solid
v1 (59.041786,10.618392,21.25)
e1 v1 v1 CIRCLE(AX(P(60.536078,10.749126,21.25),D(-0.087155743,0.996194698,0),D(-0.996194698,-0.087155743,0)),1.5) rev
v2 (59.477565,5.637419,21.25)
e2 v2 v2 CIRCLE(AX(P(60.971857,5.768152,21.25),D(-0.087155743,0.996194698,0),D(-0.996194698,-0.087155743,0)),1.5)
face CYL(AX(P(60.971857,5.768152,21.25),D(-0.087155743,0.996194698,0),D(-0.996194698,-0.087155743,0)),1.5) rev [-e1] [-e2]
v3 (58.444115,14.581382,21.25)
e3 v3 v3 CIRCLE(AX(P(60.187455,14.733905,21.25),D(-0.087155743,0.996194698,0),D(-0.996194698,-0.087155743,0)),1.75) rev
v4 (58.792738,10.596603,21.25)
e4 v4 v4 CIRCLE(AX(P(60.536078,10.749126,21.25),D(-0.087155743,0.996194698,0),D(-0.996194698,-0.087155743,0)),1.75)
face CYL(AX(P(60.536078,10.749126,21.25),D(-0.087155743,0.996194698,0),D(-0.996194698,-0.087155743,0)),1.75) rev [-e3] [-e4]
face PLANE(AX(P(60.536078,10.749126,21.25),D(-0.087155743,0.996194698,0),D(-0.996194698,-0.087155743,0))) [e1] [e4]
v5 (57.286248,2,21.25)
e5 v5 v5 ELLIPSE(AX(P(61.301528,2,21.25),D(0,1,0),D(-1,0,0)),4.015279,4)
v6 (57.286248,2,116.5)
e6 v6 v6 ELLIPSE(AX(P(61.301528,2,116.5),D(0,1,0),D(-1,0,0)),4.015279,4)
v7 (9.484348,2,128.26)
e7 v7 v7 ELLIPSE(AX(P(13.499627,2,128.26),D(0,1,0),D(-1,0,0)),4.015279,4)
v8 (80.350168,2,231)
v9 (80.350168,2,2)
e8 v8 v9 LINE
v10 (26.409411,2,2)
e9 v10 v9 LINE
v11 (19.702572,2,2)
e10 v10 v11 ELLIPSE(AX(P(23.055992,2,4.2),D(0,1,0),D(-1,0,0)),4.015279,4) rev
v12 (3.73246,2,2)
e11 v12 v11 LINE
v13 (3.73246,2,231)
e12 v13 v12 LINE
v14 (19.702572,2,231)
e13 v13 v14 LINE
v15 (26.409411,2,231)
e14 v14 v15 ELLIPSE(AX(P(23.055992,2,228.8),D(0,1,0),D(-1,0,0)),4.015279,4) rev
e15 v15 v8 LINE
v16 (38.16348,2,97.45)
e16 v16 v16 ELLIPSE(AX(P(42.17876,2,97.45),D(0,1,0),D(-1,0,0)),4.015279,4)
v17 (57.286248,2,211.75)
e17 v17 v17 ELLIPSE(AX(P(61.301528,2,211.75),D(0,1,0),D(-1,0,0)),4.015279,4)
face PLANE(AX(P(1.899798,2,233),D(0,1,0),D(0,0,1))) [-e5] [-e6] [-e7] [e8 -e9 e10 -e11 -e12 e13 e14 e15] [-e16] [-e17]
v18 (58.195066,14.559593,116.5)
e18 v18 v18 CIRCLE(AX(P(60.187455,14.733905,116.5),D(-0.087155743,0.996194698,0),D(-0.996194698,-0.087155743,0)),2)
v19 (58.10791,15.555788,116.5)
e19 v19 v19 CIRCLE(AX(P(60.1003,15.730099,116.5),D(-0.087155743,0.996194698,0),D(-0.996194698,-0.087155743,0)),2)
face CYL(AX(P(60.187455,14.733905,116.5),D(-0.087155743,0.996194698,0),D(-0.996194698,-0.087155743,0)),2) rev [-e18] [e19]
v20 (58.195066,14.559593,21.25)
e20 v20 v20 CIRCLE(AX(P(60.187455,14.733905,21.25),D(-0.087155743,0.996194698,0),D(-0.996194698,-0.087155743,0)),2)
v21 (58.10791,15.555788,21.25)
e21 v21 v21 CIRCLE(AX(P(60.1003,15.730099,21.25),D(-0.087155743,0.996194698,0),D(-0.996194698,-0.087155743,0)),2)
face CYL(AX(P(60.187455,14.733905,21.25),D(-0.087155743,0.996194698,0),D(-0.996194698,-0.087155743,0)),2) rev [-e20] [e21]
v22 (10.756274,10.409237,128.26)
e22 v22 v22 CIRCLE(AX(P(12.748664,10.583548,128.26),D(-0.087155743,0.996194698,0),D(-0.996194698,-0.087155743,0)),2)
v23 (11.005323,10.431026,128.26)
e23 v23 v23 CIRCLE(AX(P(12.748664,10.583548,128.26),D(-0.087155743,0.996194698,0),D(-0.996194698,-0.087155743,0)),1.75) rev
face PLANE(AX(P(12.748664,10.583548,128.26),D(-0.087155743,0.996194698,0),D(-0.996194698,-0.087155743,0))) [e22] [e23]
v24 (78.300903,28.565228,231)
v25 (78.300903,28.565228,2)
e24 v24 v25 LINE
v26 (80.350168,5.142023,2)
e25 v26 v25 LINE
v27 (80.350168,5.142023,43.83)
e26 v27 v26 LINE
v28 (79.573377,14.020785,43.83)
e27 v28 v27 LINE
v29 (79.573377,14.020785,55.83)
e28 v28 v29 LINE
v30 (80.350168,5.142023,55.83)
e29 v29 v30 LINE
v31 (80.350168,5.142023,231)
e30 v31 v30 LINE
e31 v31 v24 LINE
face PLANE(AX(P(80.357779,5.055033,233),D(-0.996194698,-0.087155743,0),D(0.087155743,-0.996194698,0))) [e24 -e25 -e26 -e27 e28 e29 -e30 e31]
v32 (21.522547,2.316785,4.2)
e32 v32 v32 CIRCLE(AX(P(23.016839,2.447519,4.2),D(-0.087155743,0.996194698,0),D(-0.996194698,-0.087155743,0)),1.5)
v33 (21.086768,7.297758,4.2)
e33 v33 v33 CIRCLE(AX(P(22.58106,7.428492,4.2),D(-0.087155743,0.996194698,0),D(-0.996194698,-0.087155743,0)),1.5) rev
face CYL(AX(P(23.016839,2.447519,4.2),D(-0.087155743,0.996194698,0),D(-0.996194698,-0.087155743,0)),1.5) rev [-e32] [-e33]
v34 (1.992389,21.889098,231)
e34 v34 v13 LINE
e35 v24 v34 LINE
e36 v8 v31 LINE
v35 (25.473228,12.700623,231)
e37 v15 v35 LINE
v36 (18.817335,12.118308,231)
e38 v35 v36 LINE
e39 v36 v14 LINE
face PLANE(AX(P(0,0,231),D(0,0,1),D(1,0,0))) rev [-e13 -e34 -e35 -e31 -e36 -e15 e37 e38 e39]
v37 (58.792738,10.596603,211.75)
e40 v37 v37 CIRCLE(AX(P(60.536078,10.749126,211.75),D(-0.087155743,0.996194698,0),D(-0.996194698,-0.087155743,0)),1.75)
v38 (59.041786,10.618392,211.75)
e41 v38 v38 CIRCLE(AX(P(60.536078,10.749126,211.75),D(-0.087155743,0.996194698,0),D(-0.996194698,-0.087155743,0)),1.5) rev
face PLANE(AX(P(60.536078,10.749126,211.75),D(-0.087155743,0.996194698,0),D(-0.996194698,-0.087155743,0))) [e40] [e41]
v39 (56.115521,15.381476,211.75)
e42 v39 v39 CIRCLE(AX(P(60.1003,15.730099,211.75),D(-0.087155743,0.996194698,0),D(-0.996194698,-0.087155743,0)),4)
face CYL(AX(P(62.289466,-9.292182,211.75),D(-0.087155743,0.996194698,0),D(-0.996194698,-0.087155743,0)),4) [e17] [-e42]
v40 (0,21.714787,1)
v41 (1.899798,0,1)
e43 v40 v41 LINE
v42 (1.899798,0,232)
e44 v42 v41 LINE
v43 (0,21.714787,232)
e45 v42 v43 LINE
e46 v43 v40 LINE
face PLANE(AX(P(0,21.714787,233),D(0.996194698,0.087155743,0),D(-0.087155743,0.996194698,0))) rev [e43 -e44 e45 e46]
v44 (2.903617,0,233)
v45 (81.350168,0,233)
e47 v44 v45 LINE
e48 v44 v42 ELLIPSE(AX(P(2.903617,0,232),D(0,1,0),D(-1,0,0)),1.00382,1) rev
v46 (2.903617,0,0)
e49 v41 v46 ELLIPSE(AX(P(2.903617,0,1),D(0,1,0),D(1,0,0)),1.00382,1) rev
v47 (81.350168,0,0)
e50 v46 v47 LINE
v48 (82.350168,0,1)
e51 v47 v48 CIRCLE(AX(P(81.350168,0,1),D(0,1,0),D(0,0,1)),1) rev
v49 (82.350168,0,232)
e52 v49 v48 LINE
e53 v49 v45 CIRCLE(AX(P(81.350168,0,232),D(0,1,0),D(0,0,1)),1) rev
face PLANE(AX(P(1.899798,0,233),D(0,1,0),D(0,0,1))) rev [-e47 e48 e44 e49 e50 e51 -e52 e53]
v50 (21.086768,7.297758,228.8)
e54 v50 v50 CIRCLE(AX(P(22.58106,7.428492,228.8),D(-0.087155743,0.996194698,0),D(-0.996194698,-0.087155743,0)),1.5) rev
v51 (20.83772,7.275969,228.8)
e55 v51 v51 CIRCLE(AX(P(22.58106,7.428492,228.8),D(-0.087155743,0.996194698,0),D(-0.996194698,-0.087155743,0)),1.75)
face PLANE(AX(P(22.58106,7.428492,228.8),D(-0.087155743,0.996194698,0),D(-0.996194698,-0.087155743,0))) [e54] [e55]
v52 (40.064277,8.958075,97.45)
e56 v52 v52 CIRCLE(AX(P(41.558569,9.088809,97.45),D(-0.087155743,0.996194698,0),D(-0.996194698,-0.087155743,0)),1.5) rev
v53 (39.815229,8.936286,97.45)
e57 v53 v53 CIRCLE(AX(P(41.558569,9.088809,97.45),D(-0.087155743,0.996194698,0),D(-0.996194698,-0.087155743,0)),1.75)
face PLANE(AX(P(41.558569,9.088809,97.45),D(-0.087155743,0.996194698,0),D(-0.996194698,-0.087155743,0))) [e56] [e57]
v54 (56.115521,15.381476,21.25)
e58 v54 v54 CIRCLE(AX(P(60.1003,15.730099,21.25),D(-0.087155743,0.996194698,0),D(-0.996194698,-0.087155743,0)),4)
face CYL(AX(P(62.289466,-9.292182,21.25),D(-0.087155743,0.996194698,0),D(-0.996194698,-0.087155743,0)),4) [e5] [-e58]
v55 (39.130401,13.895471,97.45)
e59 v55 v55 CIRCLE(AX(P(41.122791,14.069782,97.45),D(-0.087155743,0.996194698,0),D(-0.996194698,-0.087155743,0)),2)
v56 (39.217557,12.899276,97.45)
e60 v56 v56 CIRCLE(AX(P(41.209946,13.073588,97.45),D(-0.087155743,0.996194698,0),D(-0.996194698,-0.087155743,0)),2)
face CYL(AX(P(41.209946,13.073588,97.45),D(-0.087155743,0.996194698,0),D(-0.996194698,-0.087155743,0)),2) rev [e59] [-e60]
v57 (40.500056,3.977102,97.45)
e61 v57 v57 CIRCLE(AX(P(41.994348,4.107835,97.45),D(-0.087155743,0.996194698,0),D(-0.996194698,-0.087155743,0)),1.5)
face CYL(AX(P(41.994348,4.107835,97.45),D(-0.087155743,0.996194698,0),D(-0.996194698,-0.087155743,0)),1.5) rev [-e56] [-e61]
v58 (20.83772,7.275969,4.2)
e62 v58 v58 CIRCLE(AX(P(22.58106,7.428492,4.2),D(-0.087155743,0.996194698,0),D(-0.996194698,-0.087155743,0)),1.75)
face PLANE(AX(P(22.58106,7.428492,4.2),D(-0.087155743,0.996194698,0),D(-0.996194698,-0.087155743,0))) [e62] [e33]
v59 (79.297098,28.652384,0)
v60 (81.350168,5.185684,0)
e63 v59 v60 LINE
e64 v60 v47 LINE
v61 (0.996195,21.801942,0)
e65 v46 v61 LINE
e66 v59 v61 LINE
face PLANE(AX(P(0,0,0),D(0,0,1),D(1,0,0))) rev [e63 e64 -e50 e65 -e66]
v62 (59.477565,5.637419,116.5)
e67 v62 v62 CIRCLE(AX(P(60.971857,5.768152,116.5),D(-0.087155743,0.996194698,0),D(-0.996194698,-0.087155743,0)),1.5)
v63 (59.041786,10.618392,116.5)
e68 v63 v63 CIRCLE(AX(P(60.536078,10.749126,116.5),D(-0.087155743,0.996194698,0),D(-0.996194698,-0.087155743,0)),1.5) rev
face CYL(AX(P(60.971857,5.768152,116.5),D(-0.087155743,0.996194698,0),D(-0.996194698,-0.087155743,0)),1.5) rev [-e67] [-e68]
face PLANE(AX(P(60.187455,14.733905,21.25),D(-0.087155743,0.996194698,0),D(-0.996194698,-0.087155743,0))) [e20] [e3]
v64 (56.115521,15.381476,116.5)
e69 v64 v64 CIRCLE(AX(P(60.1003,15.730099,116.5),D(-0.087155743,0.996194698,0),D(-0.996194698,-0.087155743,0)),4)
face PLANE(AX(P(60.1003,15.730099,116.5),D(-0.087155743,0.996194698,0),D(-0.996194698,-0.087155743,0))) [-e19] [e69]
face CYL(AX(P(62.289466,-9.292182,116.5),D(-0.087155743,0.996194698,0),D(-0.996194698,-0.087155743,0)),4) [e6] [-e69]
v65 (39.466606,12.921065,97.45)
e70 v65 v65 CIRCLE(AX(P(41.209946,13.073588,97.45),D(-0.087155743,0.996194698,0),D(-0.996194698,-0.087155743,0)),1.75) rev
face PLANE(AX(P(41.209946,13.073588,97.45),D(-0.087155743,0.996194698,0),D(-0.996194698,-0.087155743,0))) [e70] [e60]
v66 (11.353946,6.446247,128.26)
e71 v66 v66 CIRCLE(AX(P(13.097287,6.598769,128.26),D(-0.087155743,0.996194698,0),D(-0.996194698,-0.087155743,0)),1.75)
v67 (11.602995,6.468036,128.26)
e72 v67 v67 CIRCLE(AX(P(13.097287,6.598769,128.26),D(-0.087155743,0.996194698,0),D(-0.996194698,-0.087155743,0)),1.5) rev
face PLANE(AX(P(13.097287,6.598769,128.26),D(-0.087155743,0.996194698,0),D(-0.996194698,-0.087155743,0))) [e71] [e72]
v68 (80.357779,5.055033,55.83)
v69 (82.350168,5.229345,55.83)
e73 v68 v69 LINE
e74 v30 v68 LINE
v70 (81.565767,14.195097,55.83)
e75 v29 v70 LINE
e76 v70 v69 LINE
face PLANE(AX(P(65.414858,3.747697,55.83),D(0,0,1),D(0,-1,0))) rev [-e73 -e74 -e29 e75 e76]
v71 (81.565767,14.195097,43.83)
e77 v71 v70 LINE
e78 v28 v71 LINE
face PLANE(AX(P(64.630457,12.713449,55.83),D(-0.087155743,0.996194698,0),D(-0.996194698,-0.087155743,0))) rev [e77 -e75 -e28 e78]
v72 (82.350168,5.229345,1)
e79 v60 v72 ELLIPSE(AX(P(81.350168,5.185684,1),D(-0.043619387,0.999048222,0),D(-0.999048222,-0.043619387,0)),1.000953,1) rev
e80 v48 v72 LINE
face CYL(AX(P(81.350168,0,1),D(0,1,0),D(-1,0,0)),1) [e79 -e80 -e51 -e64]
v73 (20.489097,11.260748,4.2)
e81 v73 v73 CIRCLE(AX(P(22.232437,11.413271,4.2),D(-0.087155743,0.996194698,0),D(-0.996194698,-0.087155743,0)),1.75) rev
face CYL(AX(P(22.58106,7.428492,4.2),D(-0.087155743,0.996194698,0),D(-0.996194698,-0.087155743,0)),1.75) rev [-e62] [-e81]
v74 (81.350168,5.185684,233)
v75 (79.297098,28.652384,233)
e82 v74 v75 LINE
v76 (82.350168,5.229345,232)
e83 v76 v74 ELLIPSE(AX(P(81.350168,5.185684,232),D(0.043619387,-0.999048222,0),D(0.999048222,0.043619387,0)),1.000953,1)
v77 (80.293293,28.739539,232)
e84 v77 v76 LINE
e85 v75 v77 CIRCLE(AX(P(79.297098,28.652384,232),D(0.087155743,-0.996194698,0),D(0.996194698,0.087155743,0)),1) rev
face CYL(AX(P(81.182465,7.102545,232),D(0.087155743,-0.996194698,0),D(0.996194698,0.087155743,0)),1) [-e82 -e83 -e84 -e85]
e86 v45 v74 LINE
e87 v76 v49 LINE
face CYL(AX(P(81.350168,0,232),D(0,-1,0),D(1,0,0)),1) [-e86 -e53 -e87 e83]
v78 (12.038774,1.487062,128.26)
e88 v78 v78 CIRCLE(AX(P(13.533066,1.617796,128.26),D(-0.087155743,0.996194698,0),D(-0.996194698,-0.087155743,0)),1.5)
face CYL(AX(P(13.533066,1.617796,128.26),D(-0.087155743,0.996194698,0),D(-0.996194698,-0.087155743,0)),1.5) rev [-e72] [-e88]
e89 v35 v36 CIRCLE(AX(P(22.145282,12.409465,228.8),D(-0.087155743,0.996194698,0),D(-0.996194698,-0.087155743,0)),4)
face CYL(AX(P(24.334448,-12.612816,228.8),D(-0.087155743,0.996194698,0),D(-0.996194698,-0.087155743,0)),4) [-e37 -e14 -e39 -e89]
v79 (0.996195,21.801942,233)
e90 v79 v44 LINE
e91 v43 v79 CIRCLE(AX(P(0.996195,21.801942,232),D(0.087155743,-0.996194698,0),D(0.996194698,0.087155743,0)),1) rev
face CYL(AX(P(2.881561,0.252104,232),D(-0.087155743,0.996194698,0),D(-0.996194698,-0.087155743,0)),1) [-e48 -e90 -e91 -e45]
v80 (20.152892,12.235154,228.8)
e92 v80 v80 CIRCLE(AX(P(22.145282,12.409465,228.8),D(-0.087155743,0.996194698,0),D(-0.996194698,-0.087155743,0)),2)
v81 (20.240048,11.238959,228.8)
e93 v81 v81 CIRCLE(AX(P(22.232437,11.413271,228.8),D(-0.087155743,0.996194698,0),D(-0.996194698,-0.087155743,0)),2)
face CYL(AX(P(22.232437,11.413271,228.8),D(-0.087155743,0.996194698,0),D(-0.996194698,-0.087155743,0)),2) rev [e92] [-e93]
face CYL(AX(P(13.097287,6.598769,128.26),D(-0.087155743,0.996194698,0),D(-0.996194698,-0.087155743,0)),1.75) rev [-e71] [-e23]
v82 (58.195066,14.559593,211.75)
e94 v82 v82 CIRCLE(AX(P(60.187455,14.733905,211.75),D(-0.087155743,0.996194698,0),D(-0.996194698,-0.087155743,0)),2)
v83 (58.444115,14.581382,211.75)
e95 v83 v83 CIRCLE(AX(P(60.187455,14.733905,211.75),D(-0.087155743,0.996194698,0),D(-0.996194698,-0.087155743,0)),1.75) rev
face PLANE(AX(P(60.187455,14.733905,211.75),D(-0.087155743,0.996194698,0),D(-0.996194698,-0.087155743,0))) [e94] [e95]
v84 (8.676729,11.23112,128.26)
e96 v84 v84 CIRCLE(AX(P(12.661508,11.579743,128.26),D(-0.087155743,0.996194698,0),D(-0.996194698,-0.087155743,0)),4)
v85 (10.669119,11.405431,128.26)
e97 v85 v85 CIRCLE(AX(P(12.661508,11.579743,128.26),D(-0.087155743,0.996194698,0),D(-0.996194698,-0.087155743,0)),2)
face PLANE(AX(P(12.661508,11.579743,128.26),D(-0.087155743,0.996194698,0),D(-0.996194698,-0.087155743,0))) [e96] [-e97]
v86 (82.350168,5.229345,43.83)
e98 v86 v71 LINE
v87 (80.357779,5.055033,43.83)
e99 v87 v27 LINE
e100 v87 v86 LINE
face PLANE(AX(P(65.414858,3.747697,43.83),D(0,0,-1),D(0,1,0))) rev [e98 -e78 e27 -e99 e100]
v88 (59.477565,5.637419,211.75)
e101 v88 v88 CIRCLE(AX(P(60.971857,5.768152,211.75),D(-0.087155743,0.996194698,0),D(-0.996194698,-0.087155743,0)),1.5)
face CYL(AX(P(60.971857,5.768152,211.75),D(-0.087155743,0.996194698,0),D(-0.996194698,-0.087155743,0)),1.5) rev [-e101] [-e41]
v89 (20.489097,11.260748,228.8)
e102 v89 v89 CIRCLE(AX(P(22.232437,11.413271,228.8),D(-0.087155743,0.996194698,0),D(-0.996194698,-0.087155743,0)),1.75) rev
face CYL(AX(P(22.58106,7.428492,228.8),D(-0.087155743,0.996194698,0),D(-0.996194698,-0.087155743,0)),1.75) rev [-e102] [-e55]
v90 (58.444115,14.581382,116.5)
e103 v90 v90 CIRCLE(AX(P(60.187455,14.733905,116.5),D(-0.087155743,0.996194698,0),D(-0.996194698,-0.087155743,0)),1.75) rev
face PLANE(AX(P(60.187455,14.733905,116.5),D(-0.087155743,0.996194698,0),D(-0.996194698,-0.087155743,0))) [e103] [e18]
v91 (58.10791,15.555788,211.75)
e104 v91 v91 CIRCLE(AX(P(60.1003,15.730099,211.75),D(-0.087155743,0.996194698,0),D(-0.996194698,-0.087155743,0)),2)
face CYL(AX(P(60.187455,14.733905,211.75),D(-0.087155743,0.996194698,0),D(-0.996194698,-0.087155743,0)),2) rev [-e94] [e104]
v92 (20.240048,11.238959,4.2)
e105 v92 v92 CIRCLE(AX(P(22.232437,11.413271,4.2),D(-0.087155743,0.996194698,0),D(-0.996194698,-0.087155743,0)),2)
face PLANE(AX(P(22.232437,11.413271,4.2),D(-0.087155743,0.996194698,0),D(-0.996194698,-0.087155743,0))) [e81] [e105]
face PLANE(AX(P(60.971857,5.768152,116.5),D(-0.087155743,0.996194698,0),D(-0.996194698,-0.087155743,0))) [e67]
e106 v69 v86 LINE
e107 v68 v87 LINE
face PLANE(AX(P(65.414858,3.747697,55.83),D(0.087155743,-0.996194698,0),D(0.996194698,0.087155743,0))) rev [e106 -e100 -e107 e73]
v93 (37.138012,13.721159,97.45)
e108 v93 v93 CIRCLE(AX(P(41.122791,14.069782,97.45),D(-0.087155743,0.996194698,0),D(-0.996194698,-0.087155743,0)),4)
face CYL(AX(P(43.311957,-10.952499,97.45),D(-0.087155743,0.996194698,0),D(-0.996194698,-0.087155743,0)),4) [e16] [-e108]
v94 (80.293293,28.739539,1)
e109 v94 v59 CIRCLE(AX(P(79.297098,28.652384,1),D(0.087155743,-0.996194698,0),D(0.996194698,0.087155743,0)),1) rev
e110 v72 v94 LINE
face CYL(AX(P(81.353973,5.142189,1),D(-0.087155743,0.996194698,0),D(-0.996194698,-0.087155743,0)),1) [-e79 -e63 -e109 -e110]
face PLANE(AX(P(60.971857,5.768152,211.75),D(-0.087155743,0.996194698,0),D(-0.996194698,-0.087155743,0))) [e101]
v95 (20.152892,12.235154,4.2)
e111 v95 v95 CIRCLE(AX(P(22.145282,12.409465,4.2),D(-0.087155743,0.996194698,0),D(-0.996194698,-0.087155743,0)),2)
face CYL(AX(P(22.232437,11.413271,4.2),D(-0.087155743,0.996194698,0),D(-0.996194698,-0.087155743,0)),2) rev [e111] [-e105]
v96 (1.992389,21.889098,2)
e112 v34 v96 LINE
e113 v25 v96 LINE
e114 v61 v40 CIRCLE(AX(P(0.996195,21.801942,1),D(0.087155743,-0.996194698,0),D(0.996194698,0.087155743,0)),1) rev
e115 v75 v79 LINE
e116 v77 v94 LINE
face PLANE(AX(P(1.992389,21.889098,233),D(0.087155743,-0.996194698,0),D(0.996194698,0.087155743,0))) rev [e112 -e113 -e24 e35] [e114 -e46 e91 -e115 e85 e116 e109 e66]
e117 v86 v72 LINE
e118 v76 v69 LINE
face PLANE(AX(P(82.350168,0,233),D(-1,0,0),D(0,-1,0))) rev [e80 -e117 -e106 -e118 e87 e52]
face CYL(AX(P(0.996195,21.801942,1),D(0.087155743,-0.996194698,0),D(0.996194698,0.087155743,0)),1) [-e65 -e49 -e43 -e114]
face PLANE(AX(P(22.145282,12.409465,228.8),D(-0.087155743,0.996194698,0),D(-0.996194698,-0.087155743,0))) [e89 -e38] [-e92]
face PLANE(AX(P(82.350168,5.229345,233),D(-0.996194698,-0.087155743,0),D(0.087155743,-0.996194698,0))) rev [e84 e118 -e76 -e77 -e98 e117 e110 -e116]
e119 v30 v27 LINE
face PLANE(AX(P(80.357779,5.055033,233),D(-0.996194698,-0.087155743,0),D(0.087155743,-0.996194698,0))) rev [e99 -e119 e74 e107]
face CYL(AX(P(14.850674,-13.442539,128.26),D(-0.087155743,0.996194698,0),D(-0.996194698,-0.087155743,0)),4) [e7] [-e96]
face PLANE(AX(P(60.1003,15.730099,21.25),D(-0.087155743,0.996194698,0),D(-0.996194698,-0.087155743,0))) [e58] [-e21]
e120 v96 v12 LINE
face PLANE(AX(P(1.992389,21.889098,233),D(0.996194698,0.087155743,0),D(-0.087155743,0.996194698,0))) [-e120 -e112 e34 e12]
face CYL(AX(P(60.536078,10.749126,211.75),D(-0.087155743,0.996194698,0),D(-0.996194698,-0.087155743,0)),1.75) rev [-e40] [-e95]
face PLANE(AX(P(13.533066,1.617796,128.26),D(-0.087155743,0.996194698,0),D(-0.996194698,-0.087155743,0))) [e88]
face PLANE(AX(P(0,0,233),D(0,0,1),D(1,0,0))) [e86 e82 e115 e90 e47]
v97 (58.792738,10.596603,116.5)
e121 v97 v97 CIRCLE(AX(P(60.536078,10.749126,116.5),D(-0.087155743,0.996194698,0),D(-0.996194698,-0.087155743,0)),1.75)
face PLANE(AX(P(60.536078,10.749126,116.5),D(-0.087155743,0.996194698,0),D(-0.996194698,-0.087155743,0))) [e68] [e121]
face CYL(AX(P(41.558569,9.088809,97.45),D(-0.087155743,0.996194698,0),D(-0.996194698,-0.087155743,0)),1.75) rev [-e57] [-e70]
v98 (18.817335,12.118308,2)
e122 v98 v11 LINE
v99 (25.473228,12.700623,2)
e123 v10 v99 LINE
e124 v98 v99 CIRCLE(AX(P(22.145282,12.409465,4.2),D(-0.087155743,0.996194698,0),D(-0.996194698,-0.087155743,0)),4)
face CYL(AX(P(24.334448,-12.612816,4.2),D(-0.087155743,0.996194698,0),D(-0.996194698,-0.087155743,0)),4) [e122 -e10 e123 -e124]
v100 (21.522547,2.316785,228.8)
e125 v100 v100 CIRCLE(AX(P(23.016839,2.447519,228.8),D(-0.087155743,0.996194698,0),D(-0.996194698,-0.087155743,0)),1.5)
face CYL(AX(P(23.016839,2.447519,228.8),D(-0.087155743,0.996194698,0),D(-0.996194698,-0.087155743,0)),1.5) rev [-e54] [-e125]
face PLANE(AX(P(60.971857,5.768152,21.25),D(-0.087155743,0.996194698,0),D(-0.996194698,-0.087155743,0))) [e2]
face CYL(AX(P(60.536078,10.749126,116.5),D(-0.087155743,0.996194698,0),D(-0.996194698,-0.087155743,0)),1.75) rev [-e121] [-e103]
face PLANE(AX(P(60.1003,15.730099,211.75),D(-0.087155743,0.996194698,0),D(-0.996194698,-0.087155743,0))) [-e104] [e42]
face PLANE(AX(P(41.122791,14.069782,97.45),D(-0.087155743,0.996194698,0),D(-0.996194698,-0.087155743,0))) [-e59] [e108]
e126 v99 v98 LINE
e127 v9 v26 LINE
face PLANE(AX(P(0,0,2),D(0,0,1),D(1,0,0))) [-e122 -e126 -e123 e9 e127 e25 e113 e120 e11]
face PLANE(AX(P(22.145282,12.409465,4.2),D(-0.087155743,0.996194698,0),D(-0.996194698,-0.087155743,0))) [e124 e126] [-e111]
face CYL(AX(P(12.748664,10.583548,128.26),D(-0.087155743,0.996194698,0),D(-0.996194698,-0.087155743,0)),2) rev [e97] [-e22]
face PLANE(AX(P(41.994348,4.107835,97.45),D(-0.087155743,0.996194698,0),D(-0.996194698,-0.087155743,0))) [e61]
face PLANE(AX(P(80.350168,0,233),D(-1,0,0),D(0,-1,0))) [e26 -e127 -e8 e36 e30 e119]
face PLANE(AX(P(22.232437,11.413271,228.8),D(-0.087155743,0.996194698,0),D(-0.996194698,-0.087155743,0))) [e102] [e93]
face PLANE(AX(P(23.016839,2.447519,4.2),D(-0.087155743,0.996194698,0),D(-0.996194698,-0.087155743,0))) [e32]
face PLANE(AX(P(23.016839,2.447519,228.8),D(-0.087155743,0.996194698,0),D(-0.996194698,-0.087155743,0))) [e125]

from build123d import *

# Parameters (mm, degrees)
SALIENTE_EXTRUIR1_DEPTH = 233
VACIADO1_T              = -2
SALIENTE_EXTRUIR2_REACH = 250.108
CROQUIS3_R              = 3.999999999999999
CROQUIS3_R_2            = 4.000000000000005
CROQUIS3_R_3            = 4.000000000000013
CROQUIS3_R_4            = 4.000000000000007
CROQUIS3_R_5            = 4.000000000000002
CROQUIS3_R_6            = 4
CROQUIS4_R              = 1.5000000000000007
CROQUIS4_R_2            = 1.4999999999999973
CROQUIS4_R_3            = 1.5000000000000042
CROQUIS4_R_4            = 1.5000000000000024
CROQUIS4_R_5            = 1.5000000000000009
CORTAR_EXTRUIR1_DEPTH   = 10
CROQUIS5_R              = 1.7500000000000002
CROQUIS5_R_2            = 1.7499999999999893
CROQUIS5_R_3            = 1.7500000000000038
CROQUIS5_R_4            = 1.749999999999997
CROQUIS5_R_5            = 1.7499999999999987
CROQUIS5_R_6            = 1.7500000000000004
CORTAR_EXTRUIR2_DEPTH   = 5
CROQUIS6_R              = 2.0000000000000036
CROQUIS6_R_2            = 1.9999999999999967
CROQUIS6_R_3            = 1.99999999999999
CROQUIS6_R_4            = 2.000000000000003
CORTAR_EXTRUIR3_DEPTH   = 1
CORTAR_EXTRUIR4_DEPTH   = 2
REDONDEO1_R             = 1


with BuildPart() as part:
    # Croquis1 → Saliente-Extruir1 (new body)
    with BuildSketch(Plane.XY):
        Polygon((82.35016819503933, 0), (82.35016819503927, 5.229344564858981), (80.29329266619476, 28.7395394398242), (78.30090327001128, 28.565227954328893), (1.9923893961834915, 21.889098059858902), (-1.33e-15, 21.7147865743636), (1.899797656141601, 0), align=None)
    extrude(amount=SALIENTE_EXTRUIR1_DEPTH)

    # Vaciado1
    vaciado1_openings = [part.faces().sort_by_distance(p)[0] for p in [
        (40.146646333, 25.227163007, 116.5),
    ]]
    offset(amount=VACIADO1_T, openings=vaciado1_openings, kind=Kind.INTERSECTION)

    # Saliente-Extruir2: up to this plane
    saliente_extruir2_end = Plane(origin=(1.899797656141601, 2, 233), z_dir=(0, 1, 0))
    # Croquis3 → Saliente-Extruir2 (add, up to the surface)
    with BuildSketch(Plane(origin=(-0.9092222397584271, 10.392457755273615, 0), x_dir=(0.9961946980917462, 0.08715574274765005, 0), z_dir=(-0.08715574274765005, 0.9961946980917462, 0)), mode=Mode.PRIVATE) as saliente_extruir2_sk1:
        with Locations((23.14256835249537, -4.200000000000009)):
            Circle(CROQUIS3_R)
    saliente_extruir2_tool1 = split(extrude(saliente_extruir2_sk1.sketch, amount=-SALIENTE_EXTRUIR2_REACH, mode=Mode.PRIVATE), bisect_by=saliente_extruir2_end, keep=Keep.BOTH, mode=Mode.PRIVATE)
    add(saliente_extruir2_tool1.solids().sort_by_distance((22.145282, 12.409465, 4.2))[0])
    # Croquis3 → Saliente-Extruir2 (add, up to the surface)
    with BuildSketch(Plane(origin=(-0.9092222397584271, 10.392457755273615, 0), x_dir=(0.9961946980917462, 0.08715574274765005, 0), z_dir=(-0.08715574274765005, 0.9961946980917462, 0)), mode=Mode.PRIVATE) as saliente_extruir2_sk2:
        with Locations(Location((61.24256835249536, -21.250000000000004, 0), (0, 0, 180))):
            Circle(CROQUIS3_R_2)
    saliente_extruir2_tool2 = split(extrude(saliente_extruir2_sk2.sketch, amount=-SALIENTE_EXTRUIR2_REACH, mode=Mode.PRIVATE), bisect_by=saliente_extruir2_end, keep=Keep.BOTH, mode=Mode.PRIVATE)
    add(saliente_extruir2_tool2.solids().sort_by_distance((60.1003, 15.730099, 21.25))[0])
    # Croquis3 → Saliente-Extruir2 (add, up to the surface)
    with BuildSketch(Plane(origin=(-0.9092222397584271, 10.392457755273615, 0), x_dir=(0.9961946980917462, 0.08715574274765005, 0), z_dir=(-0.08715574274765005, 0.9961946980917462, 0)), mode=Mode.PRIVATE) as saliente_extruir2_sk3:
        with Locations(Location((42.19256835249537, -97.45, 0), (0, 0, 180))):
            Circle(CROQUIS3_R_3)
    saliente_extruir2_tool3 = split(extrude(saliente_extruir2_sk3.sketch, amount=-SALIENTE_EXTRUIR2_REACH, mode=Mode.PRIVATE), bisect_by=saliente_extruir2_end, keep=Keep.BOTH, mode=Mode.PRIVATE)
    add(saliente_extruir2_tool3.solids().sort_by_distance((41.122791, 14.069782, 97.45))[0])
    # Croquis3 → Saliente-Extruir2 (add, up to the surface)
    with BuildSketch(Plane(origin=(-0.9092222397584271, 10.392457755273615, 0), x_dir=(0.9961946980917462, 0.08715574274765005, 0), z_dir=(-0.08715574274765005, 0.9961946980917462, 0)), mode=Mode.PRIVATE) as saliente_extruir2_sk4:
        with Locations(Location((61.24256835249536, -116.5, 0), (0, 0, 180))):
            Circle(CROQUIS3_R_4)
    saliente_extruir2_tool4 = split(extrude(saliente_extruir2_sk4.sketch, amount=-SALIENTE_EXTRUIR2_REACH, mode=Mode.PRIVATE), bisect_by=saliente_extruir2_end, keep=Keep.BOTH, mode=Mode.PRIVATE)
    add(saliente_extruir2_tool4.solids().sort_by_distance((60.1003, 15.730099, 116.5))[0])
    # Croquis3 → Saliente-Extruir2 (add, up to the surface)
    with BuildSketch(Plane(origin=(-0.9092222397584271, 10.392457755273615, 0), x_dir=(0.9961946980917462, 0.08715574274765005, 0), z_dir=(-0.08715574274765005, 0.9961946980917462, 0)), mode=Mode.PRIVATE) as saliente_extruir2_sk5:
        with Locations(Location((13.62256835249537, -128.26000000000002, 0), (0, 0, 180))):
            Circle(CROQUIS3_R_5)
    saliente_extruir2_tool5 = split(extrude(saliente_extruir2_sk5.sketch, amount=-SALIENTE_EXTRUIR2_REACH, mode=Mode.PRIVATE), bisect_by=saliente_extruir2_end, keep=Keep.BOTH, mode=Mode.PRIVATE)
    add(saliente_extruir2_tool5.solids().sort_by_distance((12.661508, 11.579743, 128.26))[0])
    # Croquis3 → Saliente-Extruir2 (add, up to the surface)
    with BuildSketch(Plane(origin=(-0.9092222397584271, 10.392457755273615, 0), x_dir=(0.9961946980917462, 0.08715574274765005, 0), z_dir=(-0.08715574274765005, 0.9961946980917462, 0)), mode=Mode.PRIVATE) as saliente_extruir2_sk6:
        with Locations((23.14256835249537, -228.8)):
            Circle(CROQUIS3_R_6)
    saliente_extruir2_tool6 = split(extrude(saliente_extruir2_sk6.sketch, amount=-SALIENTE_EXTRUIR2_REACH, mode=Mode.PRIVATE), bisect_by=saliente_extruir2_end, keep=Keep.BOTH, mode=Mode.PRIVATE)
    add(saliente_extruir2_tool6.solids().sort_by_distance((22.145282, 12.409465, 228.8))[0])
    # Croquis3 → Saliente-Extruir2 (add, up to the surface)
    with BuildSketch(Plane(origin=(-0.9092222397584271, 10.392457755273615, 0), x_dir=(0.9961946980917462, 0.08715574274765005, 0), z_dir=(-0.08715574274765005, 0.9961946980917462, 0)), mode=Mode.PRIVATE) as saliente_extruir2_sk7:
        with Locations(Location((61.24256835249536, -211.75000000000003, 0), (0, 0, 180))):
            Circle(CROQUIS3_R_4)
    saliente_extruir2_tool7 = split(extrude(saliente_extruir2_sk7.sketch, amount=-SALIENTE_EXTRUIR2_REACH, mode=Mode.PRIVATE), bisect_by=saliente_extruir2_end, keep=Keep.BOTH, mode=Mode.PRIVATE)
    add(saliente_extruir2_tool7.solids().sort_by_distance((60.1003, 15.730099, 211.75))[0])

    # Croquis4 → Cortar-Extruir1 (cut)
    with BuildSketch(Plane(origin=(-0.9092222397584271, 10.392457755273613, 0), x_dir=(0.9961946980917462, 0.08715574274765006, 0), z_dir=(-0.08715574274765006, 0.9961946980917462, 0))):
        with Locations(Location((23.142568352495374, -4.200000000000009, 0), (0, 0, 180))):
            Circle(CROQUIS4_R)
        with Locations(Location((61.24256835249536, -21.250000000000004, 0), (0, 0, 180))):
            Circle(CROQUIS4_R_2)
        with Locations(Location((42.192568352495364, -97.45, 0), (0, 0, 180))):
            Circle(CROQUIS4_R_3)
        with Locations(Location((61.24256835249536, -116.5, 0), (0, 0, 180))):
            Circle(CROQUIS4_R_2)
        with Locations(Location((13.622568352495366, -128.26000000000002, 0), (0, 0, 180))):
            Circle(CROQUIS4_R_4)
        with Locations(Location((61.24256835249536, -211.75000000000003, 0), (0, 0, 180))):
            Circle(CROQUIS4_R_2)
        with Locations(Location((23.142568352495374, -228.8, 0), (0, 0, 180))):
            Circle(CROQUIS4_R_5)
    extrude(amount=-CORTAR_EXTRUIR1_DEPTH, mode=Mode.SUBTRACT)

    # Croquis5 → Cortar-Extruir2 (cut)
    with BuildSketch(Plane(origin=(-0.9092222397584274, 10.392457755273616, 0), x_dir=(0.9961946980917462, 0.08715574274765006, 0), z_dir=(-0.08715574274765006, 0.9961946980917462, 0))):
        with Locations(Location((23.14256835249537, -4.200000000000009, 0), (0, 0, 180))):
            Circle(CROQUIS5_R)
        with Locations(Location((61.242568352495354, -21.250000000000004, 0), (0, 0, 180))):
            Circle(CROQUIS5_R_2)
        with Locations(Location((42.192568352495364, -97.45, 0), (0, 0, 180))):
            Circle(CROQUIS5_R_3)
        with Locations(Location((61.24256835249536, -116.5, 0), (0, 0, 180))):
            Circle(CROQUIS5_R_4)
        with Locations(Location((13.622568352495364, -128.26000000000002, 0), (0, 0, 180))):
            Circle(CROQUIS5_R_5)
        with Locations(Location((23.142568352495374, -228.8, 0), (0, 0, 180))):
            Circle(CROQUIS5_R_6)
        with Locations(Location((61.24256835249536, -211.75000000000003, 0), (0, 0, 180))):
            Circle(CROQUIS5_R_4)
    extrude(amount=-CORTAR_EXTRUIR2_DEPTH, mode=Mode.SUBTRACT)

    # Croquis6 → Cortar-Extruir3 (cut)
    with BuildSketch(Plane(origin=(-0.9092222397584271, 10.392457755273613, 0), x_dir=(0.9961946980917462, 0.08715574274765006, 0), z_dir=(-0.08715574274765006, 0.9961946980917462, 0))):
        with Locations(Location((13.622568352495366, -128.26000000000002, 0), (0, 0, 180))):
            Circle(CROQUIS6_R)
        with Locations(Location((23.142568352495374, -228.8, 0), (0, 0, 180))):
            Circle(CROQUIS6_R)
        with Locations(Location((61.24256835249536, -211.75000000000003, 0), (0, 0, 180))):
            Circle(CROQUIS6_R_2)
        with Locations(Location((61.242568352495354, -116.5, 0), (0, 0, 180))):
            Circle(CROQUIS6_R_3)
        with Locations(Location((42.192568352495364, -97.45, 0), (0, 0, 180))):
            Circle(CROQUIS6_R)
        with Locations(Location((61.24256835249536, -21.250000000000004, 0), (0, 0, 180))):
            Circle(CROQUIS6_R_2)
        with Locations(Location((23.14256835249537, -4.200000000000009, 0), (0, 0, 180))):
            Circle(CROQUIS6_R_4)
    extrude(amount=-CORTAR_EXTRUIR3_DEPTH, mode=Mode.SUBTRACT)

    # Croquis7 → Cortar-Extruir4 (cut)
    with BuildSketch(Plane(origin=(82.17865922472689, 7.189701065922963, 0), x_dir=(0, 0, -1), z_dir=(0.9961946980917464, 0.08715574274764931, 0))):
        Polygon((-55.83000000000002, -1.9678447444250866), (-43.830000000000005, -1.9678447444250844), (-43.83000000000001, 7.032155255574915), (-55.83000000000001, 7.032155255574913), align=None)
    extrude(amount=-CORTAR_EXTRUIR4_DEPTH, mode=Mode.SUBTRACT)

    # Redondeo1
    # the kernel refuses this fillet: 1 mm, written as the material it takes off along each edge
    with BuildSketch(Plane(origin=(82.5680575519084, 2.7388578196296147, 233), x_dir=(0, 0, -1), z_dir=(-0.08715574274764891, 0.9961946980917463, 0))) as redondeo1_piece_1:
        with BuildLine():
            CenterArc((REDONDEO1_R, REDONDEO1_R), REDONDEO1_R, 180, 90)
            Line((0, REDONDEO1_R), (0, 0))
            Line((0, 0), (REDONDEO1_R, 0))
        make_face()
    extrude(amount=28.6, mode=Mode.SUBTRACT)
    with BuildSketch(Plane(origin=(-0.21788935686912936, 24.20527331959297, 233), x_dir=(0.9961946980917461, 0.0871557427476515, 0), z_dir=(0.0871557427476515, -0.9961946980917462, 0))) as redondeo1_piece_2:
        with BuildLine():
            CenterArc((REDONDEO1_R, -REDONDEO1_R), REDONDEO1_R, 90, 90)
            Line((2.65e-15, -REDONDEO1_R), (0, 0))
            Line((0, 0), (REDONDEO1_R, 0))
        make_face()
    extrude(amount=26.79773353136612, mode=Mode.SUBTRACT)
    with BuildSketch(Plane(origin=(-0.21788935686912936, 24.20527331959297, 0), x_dir=(0.9961946980917461, 0.0871557427476515, 0), z_dir=(0.0871557427476515, -0.9961946980917462, 0))) as redondeo1_piece_3:
        with BuildLine():
            CenterArc((REDONDEO1_R, REDONDEO1_R), REDONDEO1_R, 180, 90)
            Line((2.65e-15, REDONDEO1_R), (0, 0))
            Line((0, 0), (REDONDEO1_R, 0))
        make_face()
    extrude(amount=26.79773353136612, mode=Mode.SUBTRACT)
    with BuildSketch(Plane(origin=(82.35016819503936, -2.5000000000000004, 233), x_dir=(0, 0, -1), z_dir=(-1.087e-14, 1, 0))) as redondeo1_piece_4:
        with BuildLine():
            CenterArc((REDONDEO1_R, REDONDEO1_R), REDONDEO1_R, 180, 90)
            Line((0, REDONDEO1_R), (0, 0))
            Line((0, 0), (REDONDEO1_R, 0))
        make_face()
    extrude(amount=10.229344564858982, mode=Mode.SUBTRACT)
    with BuildSketch(Plane(origin=(82.5680575519084, 2.738857819629615, 0), x_dir=(4e-17, 0, 1), z_dir=(-0.08715574274764891, 0.9961946980917463, 0))) as redondeo1_piece_5:
        with BuildLine():
            CenterArc((REDONDEO1_R, -REDONDEO1_R), REDONDEO1_R, 90, 90)
            Line((-1.5e-16, -REDONDEO1_R), (0, 0))
            Line((0, 0), (REDONDEO1_R, 0))
        make_face()
    extrude(amount=28.6, mode=Mode.SUBTRACT)
    with BuildSketch(Plane(origin=(82.35016819503936, -2.5000000000000004, 0), x_dir=(0, 0, 1), z_dir=(-1.087e-14, 1, 0))) as redondeo1_piece_6:
        with BuildLine():
            CenterArc((REDONDEO1_R, -REDONDEO1_R), REDONDEO1_R, 90, 90)
            Line((-1.1e-16, -REDONDEO1_R), (0, 0))
            Line((0, 0), (REDONDEO1_R, 0))
        make_face()
    extrude(amount=10.229344564858982, mode=Mode.SUBTRACT)


solid = part.part
